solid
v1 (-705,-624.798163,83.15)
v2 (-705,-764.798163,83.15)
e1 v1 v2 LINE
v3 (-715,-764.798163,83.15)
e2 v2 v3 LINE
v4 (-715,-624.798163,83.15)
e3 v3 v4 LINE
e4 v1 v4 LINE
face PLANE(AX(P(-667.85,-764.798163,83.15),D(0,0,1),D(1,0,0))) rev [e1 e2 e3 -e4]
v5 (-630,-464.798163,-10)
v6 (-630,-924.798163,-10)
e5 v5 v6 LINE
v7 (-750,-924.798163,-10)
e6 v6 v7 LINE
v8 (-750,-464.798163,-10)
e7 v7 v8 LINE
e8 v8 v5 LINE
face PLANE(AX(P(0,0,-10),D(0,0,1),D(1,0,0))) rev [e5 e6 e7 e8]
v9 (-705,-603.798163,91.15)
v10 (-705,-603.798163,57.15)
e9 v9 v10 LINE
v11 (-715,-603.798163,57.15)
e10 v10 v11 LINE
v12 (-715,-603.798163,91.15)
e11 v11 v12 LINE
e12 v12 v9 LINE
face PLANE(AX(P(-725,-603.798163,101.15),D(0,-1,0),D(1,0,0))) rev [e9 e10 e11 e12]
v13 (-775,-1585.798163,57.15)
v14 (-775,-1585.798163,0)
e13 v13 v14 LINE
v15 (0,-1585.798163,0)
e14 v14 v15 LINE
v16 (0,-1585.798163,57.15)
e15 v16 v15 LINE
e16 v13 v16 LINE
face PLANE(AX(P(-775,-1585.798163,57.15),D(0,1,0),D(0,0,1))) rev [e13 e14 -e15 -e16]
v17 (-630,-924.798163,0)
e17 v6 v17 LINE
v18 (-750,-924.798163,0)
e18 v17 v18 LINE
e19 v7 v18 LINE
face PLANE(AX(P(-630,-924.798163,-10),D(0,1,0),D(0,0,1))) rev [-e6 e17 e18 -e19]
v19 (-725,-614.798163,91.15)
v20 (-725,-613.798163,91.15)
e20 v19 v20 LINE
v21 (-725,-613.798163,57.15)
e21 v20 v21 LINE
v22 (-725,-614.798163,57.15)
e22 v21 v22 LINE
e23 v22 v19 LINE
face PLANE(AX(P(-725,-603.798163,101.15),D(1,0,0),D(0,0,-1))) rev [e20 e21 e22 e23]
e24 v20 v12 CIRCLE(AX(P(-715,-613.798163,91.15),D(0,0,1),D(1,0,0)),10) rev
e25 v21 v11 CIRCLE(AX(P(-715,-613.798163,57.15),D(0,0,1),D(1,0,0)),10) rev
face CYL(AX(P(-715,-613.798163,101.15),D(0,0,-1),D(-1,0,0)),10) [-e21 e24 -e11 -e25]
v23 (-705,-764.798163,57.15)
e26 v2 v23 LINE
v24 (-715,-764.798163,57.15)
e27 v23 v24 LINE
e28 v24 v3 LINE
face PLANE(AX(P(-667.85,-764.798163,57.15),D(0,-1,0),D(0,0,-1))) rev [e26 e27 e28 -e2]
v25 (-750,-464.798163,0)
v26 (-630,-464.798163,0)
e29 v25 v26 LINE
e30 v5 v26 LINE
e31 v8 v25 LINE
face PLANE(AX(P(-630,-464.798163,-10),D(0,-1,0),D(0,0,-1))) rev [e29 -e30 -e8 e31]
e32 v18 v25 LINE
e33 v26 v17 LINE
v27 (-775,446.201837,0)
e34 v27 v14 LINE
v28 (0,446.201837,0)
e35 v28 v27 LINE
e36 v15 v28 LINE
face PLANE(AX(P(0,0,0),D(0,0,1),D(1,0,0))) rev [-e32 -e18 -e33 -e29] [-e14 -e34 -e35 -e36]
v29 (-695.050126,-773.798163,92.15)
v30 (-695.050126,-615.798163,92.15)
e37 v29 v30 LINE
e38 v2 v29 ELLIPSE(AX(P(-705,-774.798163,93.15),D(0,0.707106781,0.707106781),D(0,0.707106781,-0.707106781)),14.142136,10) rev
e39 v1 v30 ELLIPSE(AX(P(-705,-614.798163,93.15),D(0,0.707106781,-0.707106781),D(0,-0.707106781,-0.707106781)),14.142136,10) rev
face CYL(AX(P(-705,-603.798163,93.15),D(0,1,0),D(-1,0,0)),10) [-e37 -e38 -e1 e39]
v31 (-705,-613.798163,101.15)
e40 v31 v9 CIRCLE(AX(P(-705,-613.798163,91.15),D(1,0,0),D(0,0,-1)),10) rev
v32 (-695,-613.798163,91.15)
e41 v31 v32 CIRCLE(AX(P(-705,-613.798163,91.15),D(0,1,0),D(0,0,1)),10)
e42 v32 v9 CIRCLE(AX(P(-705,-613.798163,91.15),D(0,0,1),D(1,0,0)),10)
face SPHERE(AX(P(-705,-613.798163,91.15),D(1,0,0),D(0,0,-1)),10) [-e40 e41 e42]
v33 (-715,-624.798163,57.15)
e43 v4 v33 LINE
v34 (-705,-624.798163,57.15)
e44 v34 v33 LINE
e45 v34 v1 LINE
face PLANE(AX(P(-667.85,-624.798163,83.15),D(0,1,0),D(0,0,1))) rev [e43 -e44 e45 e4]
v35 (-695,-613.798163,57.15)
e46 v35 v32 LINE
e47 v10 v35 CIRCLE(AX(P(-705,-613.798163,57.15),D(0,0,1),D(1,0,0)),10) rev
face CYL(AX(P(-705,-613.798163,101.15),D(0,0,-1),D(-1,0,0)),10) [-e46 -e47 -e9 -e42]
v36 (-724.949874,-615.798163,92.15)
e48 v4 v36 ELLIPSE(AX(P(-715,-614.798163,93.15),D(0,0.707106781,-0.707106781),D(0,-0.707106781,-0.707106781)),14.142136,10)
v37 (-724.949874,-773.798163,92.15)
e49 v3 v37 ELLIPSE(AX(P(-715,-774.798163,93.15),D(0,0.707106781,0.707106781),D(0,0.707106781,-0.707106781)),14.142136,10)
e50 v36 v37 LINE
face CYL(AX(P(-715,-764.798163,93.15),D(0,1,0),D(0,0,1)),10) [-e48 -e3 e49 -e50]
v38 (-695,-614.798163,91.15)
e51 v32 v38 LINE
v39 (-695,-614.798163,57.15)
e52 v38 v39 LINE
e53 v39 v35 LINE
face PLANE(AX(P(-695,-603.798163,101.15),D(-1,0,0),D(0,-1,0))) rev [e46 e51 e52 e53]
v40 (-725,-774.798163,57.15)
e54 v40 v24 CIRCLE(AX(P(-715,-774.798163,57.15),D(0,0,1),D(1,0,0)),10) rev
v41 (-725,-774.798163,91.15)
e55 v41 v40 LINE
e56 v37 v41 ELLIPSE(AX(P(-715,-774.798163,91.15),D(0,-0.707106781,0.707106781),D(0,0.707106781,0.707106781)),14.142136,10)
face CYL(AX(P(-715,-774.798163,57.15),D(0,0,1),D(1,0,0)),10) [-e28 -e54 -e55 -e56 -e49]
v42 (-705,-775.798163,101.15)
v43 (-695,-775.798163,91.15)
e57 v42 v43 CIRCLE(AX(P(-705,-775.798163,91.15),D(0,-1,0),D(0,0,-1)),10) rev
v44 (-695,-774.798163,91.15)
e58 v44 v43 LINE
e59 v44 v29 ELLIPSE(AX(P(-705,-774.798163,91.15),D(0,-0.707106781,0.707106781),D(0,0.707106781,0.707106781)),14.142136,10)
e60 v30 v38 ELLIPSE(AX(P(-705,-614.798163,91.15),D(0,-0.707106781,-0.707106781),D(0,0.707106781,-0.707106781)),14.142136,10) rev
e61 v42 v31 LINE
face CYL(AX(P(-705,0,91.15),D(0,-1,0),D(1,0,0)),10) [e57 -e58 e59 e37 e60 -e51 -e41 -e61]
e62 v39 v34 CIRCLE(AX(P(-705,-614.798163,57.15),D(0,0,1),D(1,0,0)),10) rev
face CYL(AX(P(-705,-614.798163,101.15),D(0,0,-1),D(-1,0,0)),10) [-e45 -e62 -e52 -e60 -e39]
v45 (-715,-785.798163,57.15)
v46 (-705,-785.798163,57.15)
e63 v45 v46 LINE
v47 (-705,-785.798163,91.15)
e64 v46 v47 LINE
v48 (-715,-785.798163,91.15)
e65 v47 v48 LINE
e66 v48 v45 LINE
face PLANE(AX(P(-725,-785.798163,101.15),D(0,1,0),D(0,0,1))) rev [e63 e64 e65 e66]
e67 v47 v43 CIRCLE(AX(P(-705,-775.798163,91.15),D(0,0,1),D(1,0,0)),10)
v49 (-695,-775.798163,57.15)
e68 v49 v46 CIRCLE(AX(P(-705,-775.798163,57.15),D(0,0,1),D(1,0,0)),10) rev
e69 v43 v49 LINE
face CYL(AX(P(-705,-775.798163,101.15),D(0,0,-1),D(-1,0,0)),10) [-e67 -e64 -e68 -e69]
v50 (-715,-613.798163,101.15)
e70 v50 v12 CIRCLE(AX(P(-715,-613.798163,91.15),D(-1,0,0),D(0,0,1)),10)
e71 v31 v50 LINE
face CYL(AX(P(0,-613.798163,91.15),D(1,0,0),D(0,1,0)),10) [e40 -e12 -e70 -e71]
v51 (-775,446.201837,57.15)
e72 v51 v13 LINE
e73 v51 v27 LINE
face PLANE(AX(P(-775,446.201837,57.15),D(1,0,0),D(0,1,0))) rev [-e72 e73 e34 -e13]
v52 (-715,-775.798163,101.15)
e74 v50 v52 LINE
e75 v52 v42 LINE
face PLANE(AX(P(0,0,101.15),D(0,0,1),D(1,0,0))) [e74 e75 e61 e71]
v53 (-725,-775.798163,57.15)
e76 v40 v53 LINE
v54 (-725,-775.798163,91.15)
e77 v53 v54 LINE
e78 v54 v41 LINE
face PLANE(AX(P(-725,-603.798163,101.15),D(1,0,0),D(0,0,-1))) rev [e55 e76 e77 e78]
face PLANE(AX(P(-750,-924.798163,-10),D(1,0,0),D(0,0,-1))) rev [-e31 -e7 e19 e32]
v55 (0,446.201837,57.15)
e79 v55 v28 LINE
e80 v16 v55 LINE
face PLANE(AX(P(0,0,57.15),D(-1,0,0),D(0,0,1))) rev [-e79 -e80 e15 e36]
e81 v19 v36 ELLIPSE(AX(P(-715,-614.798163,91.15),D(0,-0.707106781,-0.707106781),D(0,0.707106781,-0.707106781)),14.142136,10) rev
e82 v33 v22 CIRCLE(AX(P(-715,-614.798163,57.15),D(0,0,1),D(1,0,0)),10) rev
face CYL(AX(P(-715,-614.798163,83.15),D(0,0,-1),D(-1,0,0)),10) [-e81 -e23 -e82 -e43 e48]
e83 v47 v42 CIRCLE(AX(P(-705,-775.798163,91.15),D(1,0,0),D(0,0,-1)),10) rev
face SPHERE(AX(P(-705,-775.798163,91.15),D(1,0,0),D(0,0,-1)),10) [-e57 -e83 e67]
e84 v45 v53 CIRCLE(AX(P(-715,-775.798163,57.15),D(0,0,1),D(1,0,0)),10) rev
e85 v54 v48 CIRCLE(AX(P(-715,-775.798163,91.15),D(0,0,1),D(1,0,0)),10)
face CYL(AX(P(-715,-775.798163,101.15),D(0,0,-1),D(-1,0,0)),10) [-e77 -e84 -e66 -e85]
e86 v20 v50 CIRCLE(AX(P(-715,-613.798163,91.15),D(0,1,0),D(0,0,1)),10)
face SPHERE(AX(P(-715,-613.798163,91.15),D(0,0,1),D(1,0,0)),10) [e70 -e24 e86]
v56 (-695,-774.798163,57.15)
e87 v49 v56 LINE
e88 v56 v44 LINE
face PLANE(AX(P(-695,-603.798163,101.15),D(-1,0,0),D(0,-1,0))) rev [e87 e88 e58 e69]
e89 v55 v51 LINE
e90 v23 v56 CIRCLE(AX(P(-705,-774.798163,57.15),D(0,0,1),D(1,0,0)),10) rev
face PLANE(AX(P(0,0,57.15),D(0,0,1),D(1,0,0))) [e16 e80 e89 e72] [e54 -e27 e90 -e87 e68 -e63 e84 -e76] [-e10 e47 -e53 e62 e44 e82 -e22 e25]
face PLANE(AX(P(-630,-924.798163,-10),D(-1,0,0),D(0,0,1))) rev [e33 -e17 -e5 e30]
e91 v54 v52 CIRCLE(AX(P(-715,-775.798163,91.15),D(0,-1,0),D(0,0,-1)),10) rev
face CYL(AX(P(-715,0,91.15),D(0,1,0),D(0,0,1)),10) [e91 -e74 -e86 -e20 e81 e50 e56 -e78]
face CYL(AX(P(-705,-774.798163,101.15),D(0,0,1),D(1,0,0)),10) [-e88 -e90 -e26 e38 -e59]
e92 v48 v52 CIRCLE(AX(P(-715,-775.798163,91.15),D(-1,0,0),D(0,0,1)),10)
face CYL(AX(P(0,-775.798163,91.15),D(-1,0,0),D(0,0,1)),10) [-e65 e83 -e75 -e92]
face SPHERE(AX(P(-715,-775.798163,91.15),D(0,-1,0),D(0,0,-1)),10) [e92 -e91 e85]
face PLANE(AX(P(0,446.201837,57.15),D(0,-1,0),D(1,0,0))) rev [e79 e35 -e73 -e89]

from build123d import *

# Parameters (mm, degrees)
BOSS_EXTRUDE2_DEPTH = 57.15
SKETCH4_W           = 30
SKETCH4_H           = 182
BOSS_EXTRUDE3_DEPTH = 44
SKETCH5_W           = 26
SKETCH5_H           = 140
CUT_EXTRUDE1_DEPTH  = 57.15
FILLET1_R           = 10
SKETCH6_W           = 120
SKETCH6_H           = 460
BOSS_EXTRUDE4_DEPTH = 10


with BuildPart() as part:
    # Sketch1 → Boss-Extrude2 (new body)
    with BuildSketch(Plane.XY):
        Polygon((0, 0), (0, 446.201837212), (-775, 446.201837212), (-775, -1585.798162788), (0, -1585.798162788), align=None)
    extrude(amount=BOSS_EXTRUDE2_DEPTH)

    # Sketch4 → Boss-Extrude3 (add)
    with BuildSketch(Plane.XY.offset(57.15)):
        with Locations((-710, -694.798162788)):
            Rectangle(SKETCH4_W, SKETCH4_H)
    extrude(amount=BOSS_EXTRUDE3_DEPTH)

    # Sketch5 → Cut-Extrude1 (cut)
    with BuildSketch(Plane.ZY.offset(725)):
        with Locations((70.15, -694.798162788)):
            Rectangle(SKETCH5_W, SKETCH5_H)
    extrude(amount=-CUT_EXTRUDE1_DEPTH, mode=Mode.SUBTRACT)

    # Fillet1
    # the kernel refuses this fillet: 10 mm, written as the material it takes off along each edge
    with BuildSketch(Plane(origin=(-715, -613.798162788, 91.15), x_dir=(-1, 0, 0), z_dir=(0, 1, 0))) as fillet1_piece_1_section:
        Polygon((0, 0), (FILLET1_R * 1.02, 0), (FILLET1_R * 1.02, FILLET1_R * 1.02), (0, FILLET1_R * 1.02), align=None)
    fillet1_piece_1 = extrude(amount=FILLET1_R * 1.02, mode=Mode.PRIVATE)
    fillet1_piece_1 = fillet1_piece_1 - Plane(origin=(-715, -613.798162788, 91.15), x_dir=(0.7071067811865475, 0, -0.7071067811865475), z_dir=(0, 1, 0)) * Sphere(FILLET1_R, mode=Mode.PRIVATE)
    add(fillet1_piece_1, mode=Mode.SUBTRACT)
    with BuildSketch(Plane(origin=(-715, -775.798162788, 91.15), x_dir=(0, 0, 1), z_dir=(-1, 0, 0))) as fillet1_piece_2_section:
        Polygon((0, 0), (FILLET1_R * 1.02, 0), (FILLET1_R * 1.02, -FILLET1_R * 1.02), (0, -FILLET1_R * 1.02), align=None)
    fillet1_piece_2 = extrude(amount=FILLET1_R * 1.02, mode=Mode.PRIVATE)
    fillet1_piece_2 = fillet1_piece_2 - Plane(origin=(-715, -775.798162788, 91.15), x_dir=(0, 0.7071067811865475, -0.7071067811865475), z_dir=(-1, 0, 0)) * Sphere(FILLET1_R, mode=Mode.PRIVATE)
    add(fillet1_piece_2, mode=Mode.SUBTRACT)
    with BuildSketch(Plane(origin=(-705, -775.798162788, 91.15), x_dir=(0, -1, 0), z_dir=(0, 0, 1))) as fillet1_piece_3_section:
        Polygon((0, 0), (FILLET1_R * 1.02, 0), (FILLET1_R * 1.02, FILLET1_R * 1.02), (0, FILLET1_R * 1.02), align=None)
    fillet1_piece_3 = extrude(amount=FILLET1_R * 1.02, mode=Mode.PRIVATE)
    fillet1_piece_3 = fillet1_piece_3 - Plane(origin=(-705, -775.798162788, 91.15), x_dir=(-0.7071067811865472, 0.7071067811865477, 0), z_dir=(0, 0, 1)) * Sphere(FILLET1_R, mode=Mode.PRIVATE)
    add(fillet1_piece_3, mode=Mode.SUBTRACT)
    with BuildSketch(Plane(origin=(-705, -613.798162788, 91.15), x_dir=(0, 0, 1), z_dir=(0, 1, 0))) as fillet1_piece_4_section:
        Polygon((0, 0), (FILLET1_R * 1.02, 0), (FILLET1_R * 1.02, FILLET1_R * 1.02), (0, FILLET1_R * 1.02), align=None)
    fillet1_piece_4 = extrude(amount=FILLET1_R * 1.02, mode=Mode.PRIVATE)
    fillet1_piece_4 = fillet1_piece_4 - Plane(origin=(-705, -613.798162788, 91.15), x_dir=(-0.7071067811865475, 0, -0.7071067811865475), z_dir=(0, 1, 0)) * Sphere(FILLET1_R, mode=Mode.PRIVATE)
    add(fillet1_piece_4, mode=Mode.SUBTRACT)
    with BuildSketch(Plane(origin=(-725, -603.798162788, 57.15), x_dir=(1, 0, 0), z_dir=(0, 0, 1)), Plane(origin=(-695, -785.798162788, 57.15), x_dir=(-1, 0, 0), z_dir=(0, 0, 1)), Plane(origin=(-695, -603.798162788, 57.15), x_dir=(0, -1, 0), z_dir=(0, 0, 1))) as fillet1_piece_5:
        with BuildLine():
            CenterArc((FILLET1_R, -FILLET1_R), FILLET1_R, 90, 90)
            Line((0, -FILLET1_R), (-FILLET1_R * 0.02, -FILLET1_R))
            Line((-FILLET1_R * 0.02, -FILLET1_R), (-FILLET1_R * 0.02, FILLET1_R * 0.02))
            Line((-FILLET1_R * 0.02, FILLET1_R * 0.02), (FILLET1_R, FILLET1_R * 0.02))
            Line((FILLET1_R, FILLET1_R * 0.02), (FILLET1_R, 0))
        make_face()
    extrude(amount=34, mode=Mode.SUBTRACT)
    with BuildSketch(Plane(origin=(-725, -785.798162788, 57.15), x_dir=(1, 0, 0), z_dir=(0, 0, 1))) as fillet1_piece_6:
        with BuildLine():
            CenterArc((FILLET1_R, FILLET1_R), FILLET1_R, 180, 90)
            Line((0, FILLET1_R), (-FILLET1_R * 0.02, FILLET1_R))
            Line((-FILLET1_R * 0.02, FILLET1_R), (-FILLET1_R * 0.02, -FILLET1_R * 0.02))
            Line((-FILLET1_R * 0.02, -FILLET1_R * 0.02), (FILLET1_R, -FILLET1_R * 0.02))
            Line((FILLET1_R, -FILLET1_R * 0.02), (FILLET1_R, 0))
        make_face()
    extrude(amount=34, mode=Mode.SUBTRACT)
    with BuildSketch(Plane(origin=(-725, -775.798162788, 101.15), x_dir=(0, 0, -1), z_dir=(0, 1, 0)), Plane(origin=(-695, -613.798162788, 101.15), x_dir=(0, 0, -1), z_dir=(0, -1, 0))) as fillet1_piece_7:
        with BuildLine():
            CenterArc((FILLET1_R, -FILLET1_R), FILLET1_R, 90, 90)
            Line((0, -FILLET1_R), (-FILLET1_R * 0.02, -FILLET1_R))
            Line((-FILLET1_R * 0.02, -FILLET1_R), (-FILLET1_R * 0.02, FILLET1_R * 0.02))
            Line((-FILLET1_R * 0.02, FILLET1_R * 0.02), (FILLET1_R, FILLET1_R * 0.02))
            Line((FILLET1_R, FILLET1_R * 0.02), (FILLET1_R, 0))
        make_face()
    extrude(amount=162, mode=Mode.SUBTRACT)
    with BuildSketch(Plane(origin=(-705, -785.798162788, 101.15), x_dir=(0, 0, -1), z_dir=(-1, 0, 0)), Plane(origin=(-715, -603.798162788, 101.15), x_dir=(0, 0, -1), z_dir=(1, 0, 0))) as fillet1_piece_8:
        with BuildLine():
            CenterArc((FILLET1_R, -FILLET1_R), FILLET1_R, 90, 90)
            Line((0, -FILLET1_R), (-FILLET1_R * 0.02, -FILLET1_R))
            Line((-FILLET1_R * 0.02, -FILLET1_R), (-FILLET1_R * 0.02, FILLET1_R * 0.02))
            Line((-FILLET1_R * 0.02, FILLET1_R * 0.02), (FILLET1_R, FILLET1_R * 0.02))
            Line((FILLET1_R, FILLET1_R * 0.02), (FILLET1_R, 0))
        make_face()
    extrude(amount=10, mode=Mode.SUBTRACT)
    with BuildSketch(Plane(origin=(-695, -764.798162788, 83.15), x_dir=(0, -1, 0), z_dir=(0, 0, -1)), Plane(origin=(-695, -624.798162788, 57.15), x_dir=(0, 1, 0), z_dir=(0, 0, 1)), Plane(origin=(-725, -764.798162788, 57.15), x_dir=(0, -1, 0), z_dir=(0, 0, 1)), Plane(origin=(-725, -624.798162788, 83.15), x_dir=(0, 1, 0), z_dir=(0, 0, -1))) as fillet1_piece_9:
        with BuildLine():
            CenterArc((FILLET1_R, FILLET1_R), FILLET1_R, 180, 90)
            Line((0, FILLET1_R), (-FILLET1_R * 0.02, FILLET1_R))
            Line((-FILLET1_R * 0.02, FILLET1_R), (-FILLET1_R * 0.02, -FILLET1_R * 0.02))
            Line((-FILLET1_R * 0.02, -FILLET1_R * 0.02), (FILLET1_R, -FILLET1_R * 0.02))
            Line((FILLET1_R, -FILLET1_R * 0.02), (FILLET1_R, 0))
        make_face()
    extrude(amount=26, mode=Mode.SUBTRACT)
    with BuildSketch(Plane(origin=(-695, -624.798162788, 83.15), x_dir=(0, 0, 1), z_dir=(0, -1, 0)), Plane(origin=(-725, -764.798162788, 83.15), x_dir=(0, 0, 1), z_dir=(0, 1, 0))) as fillet1_piece_10:
        with BuildLine():
            CenterArc((FILLET1_R, FILLET1_R), FILLET1_R, 180, 90)
            Line((0, FILLET1_R), (-FILLET1_R * 0.02, FILLET1_R))
            Line((-FILLET1_R * 0.02, FILLET1_R), (-FILLET1_R * 0.02, -FILLET1_R * 0.02))
            Line((-FILLET1_R * 0.02, -FILLET1_R * 0.02), (FILLET1_R, -FILLET1_R * 0.02))
            Line((FILLET1_R, -FILLET1_R * 0.02), (FILLET1_R, 0))
        make_face()
    extrude(amount=140, mode=Mode.SUBTRACT)
    with BuildSketch(Plane(origin=(-695, -624.798162788, 83.15), x_dir=(0, 0, 1), z_dir=(0, -1, 0))) as fillet1_piece_11a_section:
        with BuildLine():
            CenterArc((FILLET1_R, FILLET1_R), FILLET1_R, 180, 90)
            Line((0, FILLET1_R), (-FILLET1_R * 0.02, FILLET1_R))
            Line((-FILLET1_R * 0.02, FILLET1_R), (-FILLET1_R * 0.02, -FILLET1_R * 0.02))
            Line((-FILLET1_R * 0.02, -FILLET1_R * 0.02), (FILLET1_R, -FILLET1_R * 0.02))
            Line((FILLET1_R, -FILLET1_R * 0.02), (FILLET1_R, 0))
        make_face()
    fillet1_piece_11a = extrude(amount=165, mode=Mode.PRIVATE)
    fillet1_piece_11a = split(fillet1_piece_11a, bisect_by=Plane(origin=(-697.263951143, -764.798162788, 85.413951143), z_dir=(0, -1, 0)), keep=Keep.TOP, mode=Mode.PRIVATE)
    with BuildSketch(Plane(origin=(-695, -764.798162788, 108.15), x_dir=(0, -1, 0), z_dir=(0, 0, -1))) as fillet1_piece_11b_section:
        with BuildLine():
            CenterArc((FILLET1_R, FILLET1_R), FILLET1_R, 180, 90)
            Line((0, FILLET1_R), (-FILLET1_R * 0.02, FILLET1_R))
            Line((-FILLET1_R * 0.02, FILLET1_R), (-FILLET1_R * 0.02, -FILLET1_R * 0.02))
            Line((-FILLET1_R * 0.02, -FILLET1_R * 0.02), (FILLET1_R, -FILLET1_R * 0.02))
            Line((FILLET1_R, -FILLET1_R * 0.02), (FILLET1_R, 0))
        make_face()
    fillet1_piece_11b = extrude(amount=51, mode=Mode.PRIVATE)
    fillet1_piece_11b = split(fillet1_piece_11b, bisect_by=Plane(origin=(-697.263951143, -767.062113931, 83.15), z_dir=(0, 0, 1)), keep=Keep.TOP, mode=Mode.PRIVATE)
    fillet1_piece_11 = fillet1_piece_11a & fillet1_piece_11b
    add(fillet1_piece_11, mode=Mode.SUBTRACT)
    with BuildSketch(Plane(origin=(-695, -624.798162788, 57.15), x_dir=(0, 1, 0), z_dir=(0, 0, 1))) as fillet1_piece_12a_section:
        with BuildLine():
            CenterArc((FILLET1_R, FILLET1_R), FILLET1_R, 180, 90)
            Line((0, FILLET1_R), (-FILLET1_R * 0.02, FILLET1_R))
            Line((-FILLET1_R * 0.02, FILLET1_R), (-FILLET1_R * 0.02, -FILLET1_R * 0.02))
            Line((-FILLET1_R * 0.02, -FILLET1_R * 0.02), (FILLET1_R, -FILLET1_R * 0.02))
            Line((FILLET1_R, -FILLET1_R * 0.02), (FILLET1_R, 0))
        make_face()
    fillet1_piece_12a = extrude(amount=51, mode=Mode.PRIVATE)
    fillet1_piece_12a = split(fillet1_piece_12a, bisect_by=Plane(origin=(-697.263951143, -622.534211645, 83.15), z_dir=(0, 0, 1)), keep=Keep.TOP, mode=Mode.PRIVATE)
    with BuildSketch(Plane(origin=(-695, -599.798162788, 83.15), x_dir=(0, 0, 1), z_dir=(0, -1, 0))) as fillet1_piece_12b_section:
        with BuildLine():
            CenterArc((FILLET1_R, FILLET1_R), FILLET1_R, 180, 90)
            Line((0, FILLET1_R), (-FILLET1_R * 0.02, FILLET1_R))
            Line((-FILLET1_R * 0.02, FILLET1_R), (-FILLET1_R * 0.02, -FILLET1_R * 0.02))
            Line((-FILLET1_R * 0.02, -FILLET1_R * 0.02), (FILLET1_R, -FILLET1_R * 0.02))
            Line((FILLET1_R, -FILLET1_R * 0.02), (FILLET1_R, 0))
        make_face()
    fillet1_piece_12b = extrude(amount=165, mode=Mode.PRIVATE)
    fillet1_piece_12b = split(fillet1_piece_12b, bisect_by=Plane(origin=(-697.263951143, -624.798162788, 85.413951143), z_dir=(0, 1, 0)), keep=Keep.TOP, mode=Mode.PRIVATE)
    fillet1_piece_12 = fillet1_piece_12a & fillet1_piece_12b
    add(fillet1_piece_12, mode=Mode.SUBTRACT)
    with BuildSketch(Plane(origin=(-725, -764.798162788, 57.15), x_dir=(0, -1, 0), z_dir=(0, 0, 1))) as fillet1_piece_13a_section:
        with BuildLine():
            CenterArc((FILLET1_R, FILLET1_R), FILLET1_R, 180, 90)
            Line((0, FILLET1_R), (-FILLET1_R * 0.02, FILLET1_R))
            Line((-FILLET1_R * 0.02, FILLET1_R), (-FILLET1_R * 0.02, -FILLET1_R * 0.02))
            Line((-FILLET1_R * 0.02, -FILLET1_R * 0.02), (FILLET1_R, -FILLET1_R * 0.02))
            Line((FILLET1_R, -FILLET1_R * 0.02), (FILLET1_R, 0))
        make_face()
    fillet1_piece_13a = extrude(amount=51, mode=Mode.PRIVATE)
    fillet1_piece_13a = split(fillet1_piece_13a, bisect_by=Plane(origin=(-722.736048857, -767.062113931, 83.15), z_dir=(0, 0, 1)), keep=Keep.TOP, mode=Mode.PRIVATE)
    with BuildSketch(Plane(origin=(-725, -789.798162788, 83.15), x_dir=(0, 0, 1), z_dir=(0, 1, 0))) as fillet1_piece_13b_section:
        with BuildLine():
            CenterArc((FILLET1_R, FILLET1_R), FILLET1_R, 180, 90)
            Line((0, FILLET1_R), (-FILLET1_R * 0.02, FILLET1_R))
            Line((-FILLET1_R * 0.02, FILLET1_R), (-FILLET1_R * 0.02, -FILLET1_R * 0.02))
            Line((-FILLET1_R * 0.02, -FILLET1_R * 0.02), (FILLET1_R, -FILLET1_R * 0.02))
            Line((FILLET1_R, -FILLET1_R * 0.02), (FILLET1_R, 0))
        make_face()
    fillet1_piece_13b = extrude(amount=165, mode=Mode.PRIVATE)
    fillet1_piece_13b = split(fillet1_piece_13b, bisect_by=Plane(origin=(-722.736048857, -764.798162788, 85.413951143), z_dir=(0, -1, 0)), keep=Keep.TOP, mode=Mode.PRIVATE)
    fillet1_piece_13 = fillet1_piece_13a & fillet1_piece_13b
    add(fillet1_piece_13, mode=Mode.SUBTRACT)
    with BuildSketch(Plane(origin=(-725, -764.798162788, 83.15), x_dir=(0, 0, 1), z_dir=(0, 1, 0))) as fillet1_piece_14a_section:
        with BuildLine():
            CenterArc((FILLET1_R, FILLET1_R), FILLET1_R, 180, 90)
            Line((0, FILLET1_R), (-FILLET1_R * 0.02, FILLET1_R))
            Line((-FILLET1_R * 0.02, FILLET1_R), (-FILLET1_R * 0.02, -FILLET1_R * 0.02))
            Line((-FILLET1_R * 0.02, -FILLET1_R * 0.02), (FILLET1_R, -FILLET1_R * 0.02))
            Line((FILLET1_R, -FILLET1_R * 0.02), (FILLET1_R, 0))
        make_face()
    fillet1_piece_14a = extrude(amount=165, mode=Mode.PRIVATE)
    fillet1_piece_14a = split(fillet1_piece_14a, bisect_by=Plane(origin=(-722.736048857, -624.798162788, 85.413951143), z_dir=(0, 1, 0)), keep=Keep.TOP, mode=Mode.PRIVATE)
    with BuildSketch(Plane(origin=(-725, -624.798162788, 108.15), x_dir=(0, 1, 0), z_dir=(0, 0, -1))) as fillet1_piece_14b_section:
        with BuildLine():
            CenterArc((FILLET1_R, FILLET1_R), FILLET1_R, 180, 90)
            Line((0, FILLET1_R), (-FILLET1_R * 0.02, FILLET1_R))
            Line((-FILLET1_R * 0.02, FILLET1_R), (-FILLET1_R * 0.02, -FILLET1_R * 0.02))
            Line((-FILLET1_R * 0.02, -FILLET1_R * 0.02), (FILLET1_R, -FILLET1_R * 0.02))
            Line((FILLET1_R, -FILLET1_R * 0.02), (FILLET1_R, 0))
        make_face()
    fillet1_piece_14b = extrude(amount=51, mode=Mode.PRIVATE)
    fillet1_piece_14b = split(fillet1_piece_14b, bisect_by=Plane(origin=(-722.736048857, -622.534211645, 83.15), z_dir=(0, 0, 1)), keep=Keep.TOP, mode=Mode.PRIVATE)
    fillet1_piece_14 = fillet1_piece_14a & fillet1_piece_14b
    add(fillet1_piece_14, mode=Mode.SUBTRACT)

    # Sketch6 → Boss-Extrude4 (add)
    with BuildSketch(Plane(origin=(0, 0, 0), x_dir=(-1, 0, 0), z_dir=(0, 0, -1))):
        with Locations((690, -694.798162788)):
            Rectangle(SKETCH6_W, SKETCH6_H)
    extrude(amount=BOSS_EXTRUDE4_DEPTH)


solid = part.part
